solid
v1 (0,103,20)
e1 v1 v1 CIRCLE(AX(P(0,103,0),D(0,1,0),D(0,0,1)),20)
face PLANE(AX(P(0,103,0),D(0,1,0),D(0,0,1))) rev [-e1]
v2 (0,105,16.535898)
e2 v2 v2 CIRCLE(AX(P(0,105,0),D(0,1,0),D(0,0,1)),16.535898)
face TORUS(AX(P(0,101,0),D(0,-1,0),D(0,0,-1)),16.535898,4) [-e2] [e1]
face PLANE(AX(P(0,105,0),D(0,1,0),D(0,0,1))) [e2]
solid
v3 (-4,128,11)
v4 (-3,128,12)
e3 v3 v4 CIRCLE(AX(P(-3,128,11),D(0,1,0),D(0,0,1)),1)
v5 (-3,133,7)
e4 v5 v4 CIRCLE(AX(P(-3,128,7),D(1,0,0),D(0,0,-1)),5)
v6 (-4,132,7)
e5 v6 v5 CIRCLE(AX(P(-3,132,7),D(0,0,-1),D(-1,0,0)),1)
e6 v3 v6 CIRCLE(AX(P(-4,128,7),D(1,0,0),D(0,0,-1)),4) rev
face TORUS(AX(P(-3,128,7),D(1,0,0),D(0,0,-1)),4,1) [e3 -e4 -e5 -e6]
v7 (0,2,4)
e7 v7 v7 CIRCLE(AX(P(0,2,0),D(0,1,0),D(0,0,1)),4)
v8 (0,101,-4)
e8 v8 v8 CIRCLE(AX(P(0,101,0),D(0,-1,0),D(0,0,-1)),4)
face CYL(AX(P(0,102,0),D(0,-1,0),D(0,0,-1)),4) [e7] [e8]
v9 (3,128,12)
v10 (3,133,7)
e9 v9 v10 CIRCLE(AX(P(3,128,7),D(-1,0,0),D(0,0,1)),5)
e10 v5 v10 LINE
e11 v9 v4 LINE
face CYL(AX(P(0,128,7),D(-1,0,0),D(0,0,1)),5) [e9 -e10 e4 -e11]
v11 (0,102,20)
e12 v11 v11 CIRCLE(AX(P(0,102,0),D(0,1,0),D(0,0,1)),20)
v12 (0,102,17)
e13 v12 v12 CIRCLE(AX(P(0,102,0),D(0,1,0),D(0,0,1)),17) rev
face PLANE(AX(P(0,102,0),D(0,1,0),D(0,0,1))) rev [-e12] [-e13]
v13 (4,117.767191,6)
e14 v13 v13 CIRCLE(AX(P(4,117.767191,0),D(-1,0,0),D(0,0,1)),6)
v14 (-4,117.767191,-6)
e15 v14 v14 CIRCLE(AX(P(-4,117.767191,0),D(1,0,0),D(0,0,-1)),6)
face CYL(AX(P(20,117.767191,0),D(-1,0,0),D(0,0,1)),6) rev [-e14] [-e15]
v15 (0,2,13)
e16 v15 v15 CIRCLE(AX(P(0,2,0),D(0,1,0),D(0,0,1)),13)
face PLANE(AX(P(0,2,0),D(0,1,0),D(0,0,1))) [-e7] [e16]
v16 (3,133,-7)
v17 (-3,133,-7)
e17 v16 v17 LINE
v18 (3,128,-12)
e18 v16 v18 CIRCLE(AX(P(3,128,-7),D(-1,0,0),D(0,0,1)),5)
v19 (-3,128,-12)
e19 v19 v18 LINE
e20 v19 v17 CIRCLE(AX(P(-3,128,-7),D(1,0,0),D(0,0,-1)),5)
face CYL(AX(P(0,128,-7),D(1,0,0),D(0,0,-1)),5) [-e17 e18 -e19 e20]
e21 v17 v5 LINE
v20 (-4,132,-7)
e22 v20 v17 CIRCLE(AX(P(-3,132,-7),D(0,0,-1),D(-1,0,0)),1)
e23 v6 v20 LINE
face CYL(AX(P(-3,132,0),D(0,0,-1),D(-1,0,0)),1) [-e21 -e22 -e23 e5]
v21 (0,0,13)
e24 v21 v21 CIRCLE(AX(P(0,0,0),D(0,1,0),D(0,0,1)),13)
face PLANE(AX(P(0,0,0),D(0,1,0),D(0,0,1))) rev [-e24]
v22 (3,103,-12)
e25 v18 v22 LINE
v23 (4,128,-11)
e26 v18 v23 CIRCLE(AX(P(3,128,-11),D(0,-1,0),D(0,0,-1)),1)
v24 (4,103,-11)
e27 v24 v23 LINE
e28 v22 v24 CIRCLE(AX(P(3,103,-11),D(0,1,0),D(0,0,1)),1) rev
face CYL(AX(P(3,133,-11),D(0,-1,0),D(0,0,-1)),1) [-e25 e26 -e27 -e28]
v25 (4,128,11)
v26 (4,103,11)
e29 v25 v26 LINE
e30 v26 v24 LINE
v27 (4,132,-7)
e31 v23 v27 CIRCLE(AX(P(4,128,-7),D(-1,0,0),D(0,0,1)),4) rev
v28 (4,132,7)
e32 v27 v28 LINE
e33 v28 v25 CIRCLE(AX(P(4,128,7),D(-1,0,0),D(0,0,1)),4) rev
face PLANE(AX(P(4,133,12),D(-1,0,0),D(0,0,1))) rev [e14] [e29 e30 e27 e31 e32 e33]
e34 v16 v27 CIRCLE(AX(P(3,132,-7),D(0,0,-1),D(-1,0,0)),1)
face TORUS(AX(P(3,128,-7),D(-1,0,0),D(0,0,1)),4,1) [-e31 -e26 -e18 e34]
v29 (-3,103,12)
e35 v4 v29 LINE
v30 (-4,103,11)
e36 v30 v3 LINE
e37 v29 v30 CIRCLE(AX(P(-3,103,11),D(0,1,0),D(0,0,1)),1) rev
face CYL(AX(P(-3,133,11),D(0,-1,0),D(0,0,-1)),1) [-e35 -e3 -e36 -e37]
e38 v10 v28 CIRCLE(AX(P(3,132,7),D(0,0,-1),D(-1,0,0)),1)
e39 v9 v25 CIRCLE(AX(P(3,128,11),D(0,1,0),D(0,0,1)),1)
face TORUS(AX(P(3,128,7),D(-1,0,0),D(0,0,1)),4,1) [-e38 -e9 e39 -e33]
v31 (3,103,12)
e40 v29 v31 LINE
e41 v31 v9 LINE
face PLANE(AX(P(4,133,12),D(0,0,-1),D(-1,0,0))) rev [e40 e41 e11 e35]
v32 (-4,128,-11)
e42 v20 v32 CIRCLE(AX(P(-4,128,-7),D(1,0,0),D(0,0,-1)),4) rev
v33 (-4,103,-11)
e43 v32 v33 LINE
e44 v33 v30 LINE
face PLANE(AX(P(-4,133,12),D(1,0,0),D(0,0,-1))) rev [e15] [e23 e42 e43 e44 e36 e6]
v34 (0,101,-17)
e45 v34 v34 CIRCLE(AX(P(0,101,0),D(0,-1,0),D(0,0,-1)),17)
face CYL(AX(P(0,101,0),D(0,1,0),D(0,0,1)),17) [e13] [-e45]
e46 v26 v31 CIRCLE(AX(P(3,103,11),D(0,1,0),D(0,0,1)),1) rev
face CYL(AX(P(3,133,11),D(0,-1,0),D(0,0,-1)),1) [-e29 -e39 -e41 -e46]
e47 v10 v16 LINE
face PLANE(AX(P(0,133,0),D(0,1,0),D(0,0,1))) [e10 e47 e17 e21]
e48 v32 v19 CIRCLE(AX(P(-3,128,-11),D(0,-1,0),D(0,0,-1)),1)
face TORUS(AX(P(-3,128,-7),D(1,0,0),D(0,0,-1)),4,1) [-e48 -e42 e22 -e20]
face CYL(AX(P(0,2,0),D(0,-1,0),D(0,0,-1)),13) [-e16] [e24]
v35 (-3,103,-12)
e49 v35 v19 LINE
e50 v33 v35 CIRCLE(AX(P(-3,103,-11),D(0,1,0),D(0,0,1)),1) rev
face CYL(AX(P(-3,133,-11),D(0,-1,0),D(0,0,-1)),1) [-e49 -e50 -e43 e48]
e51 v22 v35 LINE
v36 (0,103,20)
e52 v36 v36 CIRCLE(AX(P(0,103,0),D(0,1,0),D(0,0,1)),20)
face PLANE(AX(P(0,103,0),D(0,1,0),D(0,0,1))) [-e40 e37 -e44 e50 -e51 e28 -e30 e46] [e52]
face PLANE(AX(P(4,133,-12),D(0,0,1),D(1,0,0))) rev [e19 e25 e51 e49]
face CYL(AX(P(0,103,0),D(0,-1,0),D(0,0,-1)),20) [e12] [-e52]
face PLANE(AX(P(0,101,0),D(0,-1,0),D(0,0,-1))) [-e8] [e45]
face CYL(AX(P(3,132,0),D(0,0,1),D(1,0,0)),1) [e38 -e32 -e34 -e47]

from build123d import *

# Parameters (mm, degrees)
SKETCH1_R               = 13
BOSS_EXTRUDE1_DEPTH     = 2
SKETCH2_R               = 4
BOSS_EXTRUDE2_DEPTH     = 100
SKETCH3_R               = 20
BOSS_EXTRUDE3_DEPTH     = 1
SKETCH4_R               = 17
BOSS_EXTRUDE4_DEPTH     = 1
SKETCH5_W               = 8
SKETCH5_H               = 24
BOSS_EXTRUDE5_DEPTH     = 30
SKETCH6_R               = 20
BOSS_EXTRUDE6_DEPTH     = 2
FILLET1_R               = 4
FILLET3_R               = 5
FILLET4_R               = 1
CUT_EXTRUDE1_DEPTH      = 136.97426227
CUT_EXTRUDE1_DEPTH_BACK = 136.97426227
SKETCH11_R              = 6


with BuildPart() as part:
    # Sketch1 → Boss-Extrude1 (new body)
    with BuildSketch(Plane(origin=(0, 0, 0), x_dir=(1, 0, 0), z_dir=(0, 1, 0))):
        with Locations(Location((0, 0, 0), (0, 0, 270))):
            Circle(SKETCH1_R)
    extrude(amount=BOSS_EXTRUDE1_DEPTH)

    # Sketch2 → Boss-Extrude2 (add)
    with BuildSketch(Plane(origin=(0, 2, 0), x_dir=(1, 0, 0), z_dir=(0, 1, 0))):
        with Locations(Location((0, 0, 0), (0, 0, 270))):
            Circle(SKETCH2_R)
    extrude(amount=BOSS_EXTRUDE2_DEPTH)

    # Sketch3 → Boss-Extrude3 (add)
    with BuildSketch(Plane(origin=(0, 102, 0), x_dir=(1, 0, 0), z_dir=(0, 1, 0))):
        with Locations(Location((0, 0, 0), (0, 0, 270))):
            Circle(SKETCH3_R)
    extrude(amount=BOSS_EXTRUDE3_DEPTH)

    # Sketch4 → Boss-Extrude4 (add)
    with BuildSketch(Plane.XZ.offset(-102)):
        with Locations(Location((0, 0, 0), (0, 0, 90))):
            Circle(SKETCH4_R)
    extrude(amount=BOSS_EXTRUDE4_DEPTH)

    # Sketch5 → Boss-Extrude5 (add)
    with BuildSketch(Plane(origin=(0, 103, 0), x_dir=(1, 0, 0), z_dir=(0, 1, 0))):
        Rectangle(SKETCH5_W, SKETCH5_H)
    extrude(amount=BOSS_EXTRUDE5_DEPTH)

    # Fillet3
    fillet3_edges = [part.edges().sort_by_distance(p)[0] for p in [
        (0, 133, 12),
        (0, 133, -12),
    ]]
    fillet(fillet3_edges, radius=FILLET3_R)

    # Fillet4
    fillet4_edges = [part.edges().sort_by_distance(p)[0] for p in [
        (-4, 133, 0),
        (4, 133, 0),
        (-4, 115.5, 12),
        (-4, 115.5, -12),
        (-4, 131.535533906, 10.535533906),
        (-4, 131.535533906, -10.535533906),
        (4, 115.5, -12),
        (4, 115.5, 12),
        (4, 131.535533906, 10.535533906),
        (4, 131.535533906, -10.535533906),
    ]]
    fillet(fillet4_edges, radius=FILLET4_R)

    # Sketch11 → Cut-Extrude1 (cut, two sides: drawn at the far end of the back side and taken through both)
    with BuildSketch(Plane.ZY.offset(-CUT_EXTRUDE1_DEPTH_BACK)):
        with Locations((0, 117.767190526)):
            Circle(SKETCH11_R)
    extrude(amount=CUT_EXTRUDE1_DEPTH + CUT_EXTRUDE1_DEPTH_BACK, mode=Mode.SUBTRACT)


with BuildPart() as body_2:
    # Sketch6 → Boss-Extrude6 (new body)
    with BuildSketch(Plane(origin=(0, 103, 0), x_dir=(1, 0, 0), z_dir=(0, 1, 0))):
        with Locations(Location((0, 0, 0), (0, 0, 270))):
            Circle(SKETCH6_R)
    extrude(amount=BOSS_EXTRUDE6_DEPTH)

    # Fillet1
    # the kernel refuses this fillet: 4 mm, written as the material it takes off along each edge
    with BuildSketch(Plane(origin=(0, 105, 0), x_dir=(0, 0, 1), z_dir=(-1, 0, 0))) as fillet1_piece_1:
        with BuildLine():
            CenterArc((16.535898385, -4), FILLET1_R, 30, 60)
            Line((16.535898385, 0), (16.535898385, 0.08))
            Line((16.535898385, 0.08), (20, 0.08))
            Line((20, 0.08), (20.08, 0))
            ThreePointArc((20.08, 0), (20.08, -1), (20.069282032, -1.96))
            Line((20.069282032, -1.96), (20, -2))
        make_face()
    revolve(axis=Axis((0, 105, 0), (0, 1, 0)), mode=Mode.SUBTRACT)


solid = Compound([part.part, body_2.part])
